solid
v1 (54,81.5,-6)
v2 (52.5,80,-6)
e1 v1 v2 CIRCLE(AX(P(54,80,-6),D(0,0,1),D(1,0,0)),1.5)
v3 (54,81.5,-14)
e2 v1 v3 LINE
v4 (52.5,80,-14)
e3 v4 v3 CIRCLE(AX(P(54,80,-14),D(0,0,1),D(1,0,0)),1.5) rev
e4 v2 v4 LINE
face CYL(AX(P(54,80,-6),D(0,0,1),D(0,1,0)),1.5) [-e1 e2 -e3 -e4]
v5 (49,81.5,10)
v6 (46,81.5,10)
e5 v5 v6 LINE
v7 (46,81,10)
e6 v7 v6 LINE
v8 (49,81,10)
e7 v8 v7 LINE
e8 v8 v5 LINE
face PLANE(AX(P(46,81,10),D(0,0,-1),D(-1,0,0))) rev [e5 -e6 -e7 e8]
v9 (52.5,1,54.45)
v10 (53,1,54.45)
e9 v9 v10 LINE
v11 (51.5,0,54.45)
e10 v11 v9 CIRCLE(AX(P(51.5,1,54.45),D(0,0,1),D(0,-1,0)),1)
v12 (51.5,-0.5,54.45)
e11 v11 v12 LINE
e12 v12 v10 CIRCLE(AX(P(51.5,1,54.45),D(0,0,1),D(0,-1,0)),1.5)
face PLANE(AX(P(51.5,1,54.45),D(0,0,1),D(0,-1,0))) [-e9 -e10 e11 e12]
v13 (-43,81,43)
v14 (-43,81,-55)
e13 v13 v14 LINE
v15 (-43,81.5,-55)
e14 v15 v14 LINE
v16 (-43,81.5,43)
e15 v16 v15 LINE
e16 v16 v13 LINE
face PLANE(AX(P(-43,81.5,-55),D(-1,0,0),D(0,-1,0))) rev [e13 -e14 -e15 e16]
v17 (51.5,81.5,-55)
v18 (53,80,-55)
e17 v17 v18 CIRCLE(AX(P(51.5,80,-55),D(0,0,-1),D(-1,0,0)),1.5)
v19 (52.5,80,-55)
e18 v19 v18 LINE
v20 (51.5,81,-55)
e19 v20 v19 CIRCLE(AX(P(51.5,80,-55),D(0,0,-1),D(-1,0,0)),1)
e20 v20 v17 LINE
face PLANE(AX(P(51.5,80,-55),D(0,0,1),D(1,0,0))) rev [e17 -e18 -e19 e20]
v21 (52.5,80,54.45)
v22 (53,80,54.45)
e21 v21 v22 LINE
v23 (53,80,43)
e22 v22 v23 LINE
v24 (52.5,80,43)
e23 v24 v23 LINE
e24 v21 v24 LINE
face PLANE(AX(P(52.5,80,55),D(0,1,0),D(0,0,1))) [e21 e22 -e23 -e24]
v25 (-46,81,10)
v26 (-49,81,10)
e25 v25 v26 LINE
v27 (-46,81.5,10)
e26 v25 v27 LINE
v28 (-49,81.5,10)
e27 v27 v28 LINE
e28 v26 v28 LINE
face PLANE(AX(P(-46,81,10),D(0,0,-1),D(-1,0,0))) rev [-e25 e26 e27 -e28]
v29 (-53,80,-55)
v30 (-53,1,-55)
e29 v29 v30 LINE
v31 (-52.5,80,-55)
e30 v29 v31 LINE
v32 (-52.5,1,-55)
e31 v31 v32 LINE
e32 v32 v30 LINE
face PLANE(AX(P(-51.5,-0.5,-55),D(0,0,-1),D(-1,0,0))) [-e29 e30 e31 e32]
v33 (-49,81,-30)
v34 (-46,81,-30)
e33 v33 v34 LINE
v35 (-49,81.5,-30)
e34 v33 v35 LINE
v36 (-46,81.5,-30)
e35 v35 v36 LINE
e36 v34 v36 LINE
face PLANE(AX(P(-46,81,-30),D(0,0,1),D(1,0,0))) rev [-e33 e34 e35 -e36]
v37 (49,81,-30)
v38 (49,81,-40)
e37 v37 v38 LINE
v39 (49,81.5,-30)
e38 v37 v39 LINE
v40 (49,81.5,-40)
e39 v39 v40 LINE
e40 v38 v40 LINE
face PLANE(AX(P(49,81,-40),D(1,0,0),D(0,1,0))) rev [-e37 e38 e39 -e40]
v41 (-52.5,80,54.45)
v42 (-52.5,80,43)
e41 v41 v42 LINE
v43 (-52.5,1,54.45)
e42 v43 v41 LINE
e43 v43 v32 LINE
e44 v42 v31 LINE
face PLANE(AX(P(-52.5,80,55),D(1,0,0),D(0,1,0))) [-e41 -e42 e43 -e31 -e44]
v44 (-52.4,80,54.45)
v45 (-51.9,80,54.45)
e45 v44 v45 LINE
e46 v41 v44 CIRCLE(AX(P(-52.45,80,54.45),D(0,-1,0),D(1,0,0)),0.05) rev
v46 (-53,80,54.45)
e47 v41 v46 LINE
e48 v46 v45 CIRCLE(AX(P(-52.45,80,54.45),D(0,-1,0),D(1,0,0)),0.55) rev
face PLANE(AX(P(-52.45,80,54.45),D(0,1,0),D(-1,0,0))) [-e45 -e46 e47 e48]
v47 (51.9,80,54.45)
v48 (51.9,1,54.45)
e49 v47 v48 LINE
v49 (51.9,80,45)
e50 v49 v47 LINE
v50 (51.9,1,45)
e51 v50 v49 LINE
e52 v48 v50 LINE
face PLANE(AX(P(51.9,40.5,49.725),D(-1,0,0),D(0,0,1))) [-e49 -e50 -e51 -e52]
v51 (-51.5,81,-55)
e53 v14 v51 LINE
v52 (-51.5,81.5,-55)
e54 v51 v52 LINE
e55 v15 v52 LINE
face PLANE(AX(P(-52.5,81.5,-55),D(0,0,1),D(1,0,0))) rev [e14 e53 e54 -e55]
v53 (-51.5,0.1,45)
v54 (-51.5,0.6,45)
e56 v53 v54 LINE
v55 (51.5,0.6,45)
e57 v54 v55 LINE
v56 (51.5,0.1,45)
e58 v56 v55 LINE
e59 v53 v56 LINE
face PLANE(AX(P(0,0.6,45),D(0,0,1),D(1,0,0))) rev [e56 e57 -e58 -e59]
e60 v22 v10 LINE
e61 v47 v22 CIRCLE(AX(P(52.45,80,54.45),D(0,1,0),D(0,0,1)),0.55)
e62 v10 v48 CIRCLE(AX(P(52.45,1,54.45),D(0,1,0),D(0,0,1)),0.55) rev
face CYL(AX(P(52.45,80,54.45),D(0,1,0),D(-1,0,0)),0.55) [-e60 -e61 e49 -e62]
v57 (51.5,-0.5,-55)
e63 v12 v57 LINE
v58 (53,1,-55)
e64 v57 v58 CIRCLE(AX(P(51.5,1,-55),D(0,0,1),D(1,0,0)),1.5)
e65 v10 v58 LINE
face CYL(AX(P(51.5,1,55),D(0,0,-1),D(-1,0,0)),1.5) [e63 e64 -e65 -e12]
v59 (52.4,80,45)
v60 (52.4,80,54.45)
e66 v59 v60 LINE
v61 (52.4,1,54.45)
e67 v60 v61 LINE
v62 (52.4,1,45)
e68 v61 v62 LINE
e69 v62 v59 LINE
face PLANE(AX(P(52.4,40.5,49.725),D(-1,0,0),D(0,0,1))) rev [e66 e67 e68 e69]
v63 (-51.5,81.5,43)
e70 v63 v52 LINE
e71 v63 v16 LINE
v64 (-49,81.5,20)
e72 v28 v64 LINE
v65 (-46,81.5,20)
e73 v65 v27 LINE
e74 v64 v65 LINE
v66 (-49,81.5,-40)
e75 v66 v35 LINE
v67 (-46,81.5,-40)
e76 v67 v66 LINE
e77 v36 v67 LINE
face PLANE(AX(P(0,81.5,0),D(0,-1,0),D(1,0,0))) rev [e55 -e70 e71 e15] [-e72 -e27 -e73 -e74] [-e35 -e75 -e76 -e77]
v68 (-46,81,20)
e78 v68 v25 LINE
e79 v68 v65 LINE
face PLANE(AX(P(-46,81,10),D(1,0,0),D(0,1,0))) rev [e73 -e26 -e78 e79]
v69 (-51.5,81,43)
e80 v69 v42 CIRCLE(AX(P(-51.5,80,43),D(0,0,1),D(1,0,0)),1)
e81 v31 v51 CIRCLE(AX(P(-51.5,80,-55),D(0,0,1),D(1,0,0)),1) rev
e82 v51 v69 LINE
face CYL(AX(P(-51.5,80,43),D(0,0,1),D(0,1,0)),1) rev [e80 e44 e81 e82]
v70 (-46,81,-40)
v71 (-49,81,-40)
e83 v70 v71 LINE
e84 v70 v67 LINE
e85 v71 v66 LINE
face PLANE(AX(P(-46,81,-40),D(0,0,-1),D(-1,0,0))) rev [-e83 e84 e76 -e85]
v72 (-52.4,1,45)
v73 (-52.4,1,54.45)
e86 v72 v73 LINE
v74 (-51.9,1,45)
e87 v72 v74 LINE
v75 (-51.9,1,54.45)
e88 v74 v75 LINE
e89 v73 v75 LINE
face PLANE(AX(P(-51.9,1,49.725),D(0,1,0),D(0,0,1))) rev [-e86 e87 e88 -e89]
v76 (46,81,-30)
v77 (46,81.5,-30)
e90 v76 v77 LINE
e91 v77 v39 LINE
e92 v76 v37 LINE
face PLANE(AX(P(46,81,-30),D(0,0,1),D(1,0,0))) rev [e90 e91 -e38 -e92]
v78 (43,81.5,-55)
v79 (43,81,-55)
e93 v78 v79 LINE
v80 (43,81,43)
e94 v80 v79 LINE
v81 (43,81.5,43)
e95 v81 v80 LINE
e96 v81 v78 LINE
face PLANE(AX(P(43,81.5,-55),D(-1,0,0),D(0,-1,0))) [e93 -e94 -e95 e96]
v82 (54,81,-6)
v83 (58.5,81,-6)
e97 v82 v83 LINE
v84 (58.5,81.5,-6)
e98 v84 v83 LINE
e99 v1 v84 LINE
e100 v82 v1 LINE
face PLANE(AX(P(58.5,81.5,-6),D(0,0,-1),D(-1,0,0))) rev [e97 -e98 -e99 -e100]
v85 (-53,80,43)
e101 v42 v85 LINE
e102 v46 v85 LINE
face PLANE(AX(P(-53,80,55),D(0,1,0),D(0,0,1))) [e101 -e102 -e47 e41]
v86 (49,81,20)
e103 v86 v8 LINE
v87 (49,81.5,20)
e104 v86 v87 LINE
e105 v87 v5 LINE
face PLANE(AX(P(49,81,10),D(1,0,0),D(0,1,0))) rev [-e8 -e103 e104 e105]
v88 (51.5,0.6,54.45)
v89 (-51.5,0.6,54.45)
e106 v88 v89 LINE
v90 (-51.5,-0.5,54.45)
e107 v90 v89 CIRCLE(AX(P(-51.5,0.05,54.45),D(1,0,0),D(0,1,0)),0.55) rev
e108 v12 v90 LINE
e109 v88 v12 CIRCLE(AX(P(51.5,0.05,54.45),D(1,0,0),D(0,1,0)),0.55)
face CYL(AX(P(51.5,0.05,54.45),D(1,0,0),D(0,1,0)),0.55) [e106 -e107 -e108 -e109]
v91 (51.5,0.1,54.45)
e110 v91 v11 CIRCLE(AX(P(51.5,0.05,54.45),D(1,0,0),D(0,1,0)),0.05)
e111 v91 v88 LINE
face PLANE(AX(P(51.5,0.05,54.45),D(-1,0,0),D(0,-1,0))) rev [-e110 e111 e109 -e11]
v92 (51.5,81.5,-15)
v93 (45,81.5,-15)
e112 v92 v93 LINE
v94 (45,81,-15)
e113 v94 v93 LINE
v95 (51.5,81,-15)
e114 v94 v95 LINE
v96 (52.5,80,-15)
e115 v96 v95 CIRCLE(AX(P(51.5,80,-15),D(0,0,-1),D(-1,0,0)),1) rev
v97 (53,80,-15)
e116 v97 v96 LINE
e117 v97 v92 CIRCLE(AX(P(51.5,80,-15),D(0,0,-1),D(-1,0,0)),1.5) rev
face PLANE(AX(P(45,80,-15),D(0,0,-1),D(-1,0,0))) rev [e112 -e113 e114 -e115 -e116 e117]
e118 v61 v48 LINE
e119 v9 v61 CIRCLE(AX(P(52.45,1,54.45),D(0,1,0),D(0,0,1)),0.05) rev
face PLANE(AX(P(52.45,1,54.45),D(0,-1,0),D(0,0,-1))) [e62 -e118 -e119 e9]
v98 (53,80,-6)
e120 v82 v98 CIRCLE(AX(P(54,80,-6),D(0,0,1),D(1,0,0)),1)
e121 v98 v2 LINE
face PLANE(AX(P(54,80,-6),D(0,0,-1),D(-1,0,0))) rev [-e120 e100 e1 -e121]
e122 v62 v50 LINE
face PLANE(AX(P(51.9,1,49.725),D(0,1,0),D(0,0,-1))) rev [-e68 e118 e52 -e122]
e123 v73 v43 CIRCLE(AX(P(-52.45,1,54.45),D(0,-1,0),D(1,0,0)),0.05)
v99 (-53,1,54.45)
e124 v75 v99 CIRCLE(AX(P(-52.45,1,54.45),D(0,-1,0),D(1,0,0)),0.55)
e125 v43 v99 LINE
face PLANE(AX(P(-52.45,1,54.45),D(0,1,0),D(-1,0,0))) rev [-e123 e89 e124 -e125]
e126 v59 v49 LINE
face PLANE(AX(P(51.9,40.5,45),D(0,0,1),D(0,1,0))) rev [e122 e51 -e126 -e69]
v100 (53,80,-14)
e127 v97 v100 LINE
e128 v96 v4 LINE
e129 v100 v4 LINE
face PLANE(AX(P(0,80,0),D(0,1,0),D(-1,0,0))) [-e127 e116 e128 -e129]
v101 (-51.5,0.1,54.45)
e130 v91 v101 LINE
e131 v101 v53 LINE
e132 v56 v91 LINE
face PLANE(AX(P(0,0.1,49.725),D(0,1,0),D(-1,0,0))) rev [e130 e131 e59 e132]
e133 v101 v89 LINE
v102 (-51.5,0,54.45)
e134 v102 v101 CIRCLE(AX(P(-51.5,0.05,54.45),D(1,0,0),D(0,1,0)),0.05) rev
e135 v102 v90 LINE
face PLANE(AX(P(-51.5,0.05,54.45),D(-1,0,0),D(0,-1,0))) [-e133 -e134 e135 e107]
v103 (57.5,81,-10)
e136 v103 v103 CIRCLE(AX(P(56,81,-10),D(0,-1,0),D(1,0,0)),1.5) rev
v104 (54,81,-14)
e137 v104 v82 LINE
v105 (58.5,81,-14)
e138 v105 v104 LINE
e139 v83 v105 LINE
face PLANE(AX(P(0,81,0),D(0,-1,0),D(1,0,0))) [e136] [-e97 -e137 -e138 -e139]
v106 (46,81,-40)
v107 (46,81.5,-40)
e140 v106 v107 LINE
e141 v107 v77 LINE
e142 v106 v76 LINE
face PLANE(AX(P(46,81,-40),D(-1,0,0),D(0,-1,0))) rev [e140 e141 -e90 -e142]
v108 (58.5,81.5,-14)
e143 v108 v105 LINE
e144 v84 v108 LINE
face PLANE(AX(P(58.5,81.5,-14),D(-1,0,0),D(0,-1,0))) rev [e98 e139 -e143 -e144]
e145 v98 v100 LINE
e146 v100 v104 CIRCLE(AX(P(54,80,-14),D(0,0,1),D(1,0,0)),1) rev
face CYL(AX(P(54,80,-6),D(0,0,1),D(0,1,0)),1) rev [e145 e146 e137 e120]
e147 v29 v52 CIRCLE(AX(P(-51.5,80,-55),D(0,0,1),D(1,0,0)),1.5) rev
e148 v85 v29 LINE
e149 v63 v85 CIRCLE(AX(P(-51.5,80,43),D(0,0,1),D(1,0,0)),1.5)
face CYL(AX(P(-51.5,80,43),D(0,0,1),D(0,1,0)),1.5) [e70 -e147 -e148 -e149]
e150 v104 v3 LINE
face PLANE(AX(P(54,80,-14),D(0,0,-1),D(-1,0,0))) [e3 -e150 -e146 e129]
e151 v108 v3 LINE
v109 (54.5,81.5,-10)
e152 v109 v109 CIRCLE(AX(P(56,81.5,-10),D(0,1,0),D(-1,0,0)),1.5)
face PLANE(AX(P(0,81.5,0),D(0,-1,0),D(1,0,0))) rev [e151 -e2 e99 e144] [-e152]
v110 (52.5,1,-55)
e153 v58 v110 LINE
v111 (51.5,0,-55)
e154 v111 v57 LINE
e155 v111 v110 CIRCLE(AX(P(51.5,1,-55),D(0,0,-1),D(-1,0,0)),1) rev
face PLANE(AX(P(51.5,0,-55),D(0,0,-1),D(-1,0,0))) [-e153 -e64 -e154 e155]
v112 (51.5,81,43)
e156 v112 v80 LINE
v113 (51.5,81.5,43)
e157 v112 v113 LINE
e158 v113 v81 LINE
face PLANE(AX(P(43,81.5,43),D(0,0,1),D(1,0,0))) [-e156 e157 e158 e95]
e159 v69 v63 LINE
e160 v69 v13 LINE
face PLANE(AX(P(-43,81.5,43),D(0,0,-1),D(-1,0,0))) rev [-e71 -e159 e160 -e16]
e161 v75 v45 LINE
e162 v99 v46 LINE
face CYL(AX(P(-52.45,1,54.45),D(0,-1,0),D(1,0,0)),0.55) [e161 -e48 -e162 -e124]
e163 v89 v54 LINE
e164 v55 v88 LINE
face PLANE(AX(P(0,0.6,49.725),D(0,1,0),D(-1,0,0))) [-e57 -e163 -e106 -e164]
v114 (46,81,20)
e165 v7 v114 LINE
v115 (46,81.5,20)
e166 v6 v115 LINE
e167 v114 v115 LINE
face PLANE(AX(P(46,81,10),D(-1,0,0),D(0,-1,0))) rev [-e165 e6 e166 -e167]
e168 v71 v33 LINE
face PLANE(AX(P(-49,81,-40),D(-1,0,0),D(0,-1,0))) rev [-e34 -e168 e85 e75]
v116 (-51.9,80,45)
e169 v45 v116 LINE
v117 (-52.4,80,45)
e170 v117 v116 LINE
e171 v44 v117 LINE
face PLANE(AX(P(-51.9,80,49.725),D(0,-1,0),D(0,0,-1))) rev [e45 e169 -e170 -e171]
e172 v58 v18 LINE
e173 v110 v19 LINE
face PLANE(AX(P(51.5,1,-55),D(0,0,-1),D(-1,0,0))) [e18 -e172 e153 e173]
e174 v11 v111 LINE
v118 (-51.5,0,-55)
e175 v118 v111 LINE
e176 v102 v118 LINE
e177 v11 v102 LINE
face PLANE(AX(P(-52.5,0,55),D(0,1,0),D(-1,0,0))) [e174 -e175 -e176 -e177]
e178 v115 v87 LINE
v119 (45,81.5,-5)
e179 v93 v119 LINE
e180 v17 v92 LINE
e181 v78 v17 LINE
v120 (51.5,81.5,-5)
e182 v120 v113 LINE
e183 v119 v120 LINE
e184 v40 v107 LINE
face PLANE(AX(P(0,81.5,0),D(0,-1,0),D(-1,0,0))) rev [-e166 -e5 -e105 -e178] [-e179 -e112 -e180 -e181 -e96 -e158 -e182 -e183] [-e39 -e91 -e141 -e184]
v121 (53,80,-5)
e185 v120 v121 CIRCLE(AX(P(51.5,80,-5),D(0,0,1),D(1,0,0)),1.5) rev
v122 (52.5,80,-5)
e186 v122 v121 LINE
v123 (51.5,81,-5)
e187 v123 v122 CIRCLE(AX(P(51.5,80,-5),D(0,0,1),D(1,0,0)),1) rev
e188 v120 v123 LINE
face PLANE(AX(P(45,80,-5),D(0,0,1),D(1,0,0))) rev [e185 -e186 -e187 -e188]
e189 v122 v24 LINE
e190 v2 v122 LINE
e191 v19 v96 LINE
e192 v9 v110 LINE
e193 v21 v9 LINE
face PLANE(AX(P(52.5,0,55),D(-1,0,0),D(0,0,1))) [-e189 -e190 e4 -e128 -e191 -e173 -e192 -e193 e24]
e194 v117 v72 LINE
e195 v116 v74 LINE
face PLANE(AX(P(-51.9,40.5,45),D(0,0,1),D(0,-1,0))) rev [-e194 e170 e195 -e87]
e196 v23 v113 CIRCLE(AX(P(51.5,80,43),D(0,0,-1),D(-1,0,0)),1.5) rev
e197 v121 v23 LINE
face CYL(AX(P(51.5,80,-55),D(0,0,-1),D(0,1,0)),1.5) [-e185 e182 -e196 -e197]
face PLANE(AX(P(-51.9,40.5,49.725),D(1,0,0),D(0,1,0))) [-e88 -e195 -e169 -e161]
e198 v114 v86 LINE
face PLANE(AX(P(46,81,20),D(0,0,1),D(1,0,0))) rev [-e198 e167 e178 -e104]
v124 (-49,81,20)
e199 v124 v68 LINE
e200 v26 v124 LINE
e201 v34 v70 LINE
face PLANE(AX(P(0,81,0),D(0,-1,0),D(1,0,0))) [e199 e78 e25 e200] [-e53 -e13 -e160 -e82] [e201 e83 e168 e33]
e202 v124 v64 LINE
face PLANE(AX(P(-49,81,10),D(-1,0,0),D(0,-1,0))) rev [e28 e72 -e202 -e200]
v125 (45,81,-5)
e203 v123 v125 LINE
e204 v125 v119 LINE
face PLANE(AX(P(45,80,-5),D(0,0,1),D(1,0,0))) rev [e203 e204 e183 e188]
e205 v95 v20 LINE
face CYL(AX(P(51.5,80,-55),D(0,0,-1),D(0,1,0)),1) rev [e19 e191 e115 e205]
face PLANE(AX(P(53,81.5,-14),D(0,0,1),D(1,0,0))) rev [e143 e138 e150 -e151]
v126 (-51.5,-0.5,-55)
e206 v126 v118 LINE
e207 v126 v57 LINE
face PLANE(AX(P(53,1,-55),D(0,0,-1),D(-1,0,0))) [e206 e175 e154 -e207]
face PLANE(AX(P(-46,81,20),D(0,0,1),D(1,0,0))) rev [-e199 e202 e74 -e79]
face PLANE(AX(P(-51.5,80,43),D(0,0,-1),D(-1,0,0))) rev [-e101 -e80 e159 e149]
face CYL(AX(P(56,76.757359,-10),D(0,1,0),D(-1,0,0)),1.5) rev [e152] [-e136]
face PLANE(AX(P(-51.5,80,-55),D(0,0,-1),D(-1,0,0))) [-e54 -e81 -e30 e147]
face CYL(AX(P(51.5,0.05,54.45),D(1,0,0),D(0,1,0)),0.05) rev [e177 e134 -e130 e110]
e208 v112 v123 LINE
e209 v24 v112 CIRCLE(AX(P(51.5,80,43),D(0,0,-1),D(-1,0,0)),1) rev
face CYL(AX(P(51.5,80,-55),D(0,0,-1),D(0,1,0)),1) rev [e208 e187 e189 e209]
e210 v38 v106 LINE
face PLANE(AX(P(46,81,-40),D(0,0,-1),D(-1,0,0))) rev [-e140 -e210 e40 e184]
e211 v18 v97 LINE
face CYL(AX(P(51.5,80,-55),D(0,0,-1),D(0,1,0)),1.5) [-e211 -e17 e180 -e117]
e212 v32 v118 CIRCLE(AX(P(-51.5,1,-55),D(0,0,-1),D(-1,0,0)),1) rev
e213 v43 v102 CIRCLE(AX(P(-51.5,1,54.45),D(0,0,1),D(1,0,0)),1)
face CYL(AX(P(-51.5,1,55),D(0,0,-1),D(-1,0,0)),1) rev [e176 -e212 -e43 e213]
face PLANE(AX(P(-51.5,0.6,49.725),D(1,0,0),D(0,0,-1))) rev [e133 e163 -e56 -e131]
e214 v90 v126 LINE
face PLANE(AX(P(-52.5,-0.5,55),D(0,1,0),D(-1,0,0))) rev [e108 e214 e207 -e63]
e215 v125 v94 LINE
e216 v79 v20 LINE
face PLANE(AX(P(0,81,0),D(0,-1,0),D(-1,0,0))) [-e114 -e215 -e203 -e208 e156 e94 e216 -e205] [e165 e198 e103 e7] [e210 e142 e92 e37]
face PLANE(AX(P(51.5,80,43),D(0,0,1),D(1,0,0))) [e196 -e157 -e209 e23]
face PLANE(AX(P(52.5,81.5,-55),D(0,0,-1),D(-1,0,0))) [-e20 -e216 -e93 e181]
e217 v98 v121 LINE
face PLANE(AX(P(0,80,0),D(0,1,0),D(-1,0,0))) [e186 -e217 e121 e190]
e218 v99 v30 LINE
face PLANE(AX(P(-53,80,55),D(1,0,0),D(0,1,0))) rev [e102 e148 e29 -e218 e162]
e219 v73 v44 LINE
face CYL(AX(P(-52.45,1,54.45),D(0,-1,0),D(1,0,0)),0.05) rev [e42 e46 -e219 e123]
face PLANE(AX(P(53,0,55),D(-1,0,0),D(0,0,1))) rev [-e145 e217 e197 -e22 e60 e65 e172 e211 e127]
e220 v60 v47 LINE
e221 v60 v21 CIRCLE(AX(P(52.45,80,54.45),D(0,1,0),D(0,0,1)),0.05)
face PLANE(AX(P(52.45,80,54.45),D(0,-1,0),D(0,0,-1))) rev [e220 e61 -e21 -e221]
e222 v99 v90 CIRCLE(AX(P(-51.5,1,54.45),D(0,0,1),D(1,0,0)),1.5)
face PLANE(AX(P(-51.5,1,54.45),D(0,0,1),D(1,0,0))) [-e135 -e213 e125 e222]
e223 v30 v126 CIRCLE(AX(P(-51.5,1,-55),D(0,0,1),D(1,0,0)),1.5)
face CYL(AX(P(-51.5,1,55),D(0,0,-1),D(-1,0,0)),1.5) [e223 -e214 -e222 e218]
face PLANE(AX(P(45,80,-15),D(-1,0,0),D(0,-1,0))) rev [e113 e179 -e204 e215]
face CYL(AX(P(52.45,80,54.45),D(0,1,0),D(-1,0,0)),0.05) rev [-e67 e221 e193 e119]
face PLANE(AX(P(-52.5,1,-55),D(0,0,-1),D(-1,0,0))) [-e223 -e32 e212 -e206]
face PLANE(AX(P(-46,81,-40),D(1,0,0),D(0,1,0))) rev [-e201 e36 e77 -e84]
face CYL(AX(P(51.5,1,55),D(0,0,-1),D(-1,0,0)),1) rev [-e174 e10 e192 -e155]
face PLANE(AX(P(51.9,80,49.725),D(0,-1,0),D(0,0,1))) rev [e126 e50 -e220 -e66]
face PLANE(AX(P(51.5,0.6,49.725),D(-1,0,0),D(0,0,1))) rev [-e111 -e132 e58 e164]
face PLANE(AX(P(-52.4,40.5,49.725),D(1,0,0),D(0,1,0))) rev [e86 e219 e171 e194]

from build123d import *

# Parameters (mm, degrees)
SM_BASE_FLANGE_1_DEPTH = 55
OTHER_START            = -1
OTHER_1_DEPTH          = 2
OTHER_START_2          = 1
OTHER_1_2_DEPTH        = 79
OTHER_START_3          = -0.24719
OTHER_1_3_DEPTH        = 81.24719
OTHER_START_4          = -51.5
OTHER_1_4_DEPTH        = 103
OTHER_1_5_DEPTH        = 103
SM_EDGE_FLANGE_1_DEPTH = 98
SKETCH_19_W            = 10
SKETCH_19_H            = 10
CUT_EXTRUDE_1_DEPTH    = 1.5
SM_EDGE_FLANGE_2_DEPTH = 8
SKETCH_24_R            = 1.5
CUT_EXTRUDE_2_DEPTH    = 0.5
SKETCH_27_W            = 3
SKETCH_27_H            = 10
CUT_EXTRUDE_3_DEPTH    = 0.5


with BuildPart() as part:
    # 基体-法兰1: sheet metal written as solids
    # Sketch 1 → 基体-法兰1 (new, symmetric)
    with BuildSketch(Plane.XY):
        with BuildLine():
            Line((-52.5, 80), (-52.5, 1))
            ThreePointArc((-52.5, 1), (-52.207106781, 0.292893219), (-51.5, 0))
            Line((-51.5, 0), (51.5, 0))
            ThreePointArc((51.5, 0), (52.207106781, 0.292893219), (52.5, 1))
            Line((52.5, 1), (52.5, 80))
            Line((52.5, 80), (53, 80))
            Line((53, 80), (53, 1))
            ThreePointArc((53, 1), (52.560660172, -0.060660172), (51.5, -0.5))
            Line((51.5, -0.5), (-51.5, -0.5))
            ThreePointArc((-51.5, -0.5), (-52.560660172, -0.060660172), (-53, 1))
            Line((-53, 1), (-53, 80))
            Line((-53, 80), (-52.5, 80))
        make_face()
    extrude(amount=SM_BASE_FLANGE_1_DEPTH, both=True)

    # Other 1: read off the stored shape, not the designer's step
    # Other 1 outline → Other 1 (cut)
    with BuildSketch(Plane(origin=(0, 0, 0), x_dir=(1, 0, 0), z_dir=(0, 1, 0)).offset(OTHER_START)):
        with BuildLine():
            Line((51.5, -54.45), (51.5, -55))
            Line((51.5, -55), (52.45, -55))
            ThreePointArc((52.45, -55), (52.83890873, -54.83890873), (53, -54.45))
            Line((53, -54.45), (51.5, -54.45))
        make_face()
        with BuildLine():
            Line((-52.45, -55), (-51.5, -55))
            Line((-51.5, -55), (-51.5, -54.45))
            Line((-51.5, -54.45), (-53, -54.45))
            ThreePointArc((-53, -54.45), (-52.83890873, -54.83890873), (-52.45, -55))
        make_face()
    extrude(amount=OTHER_1_DEPTH, mode=Mode.SUBTRACT)

    # Other 1 2 outline → Other 1 2 (add)
    with BuildSketch(Plane(origin=(0, 0, 0), x_dir=(1, 0, 0), z_dir=(0, 1, 0)).offset(OTHER_START_2)):
        with BuildLine():
            Line((51.9, -45), (51.9, -54.45))
            ThreePointArc((51.9, -54.45), (52.45, -55), (53, -54.45))
            Line((53, -54.45), (52.5, -54.45))
            ThreePointArc((52.5, -54.45), (52.45, -54.5), (52.4, -54.45))
            Line((52.4, -54.45), (52.4, -45))
            Line((52.4, -45), (51.9, -45))
        make_face()
        with BuildLine():
            ThreePointArc((-53, -54.45), (-52.45, -55), (-51.9, -54.45))
            Line((-51.9, -54.45), (-51.9, -45))
            Line((-51.9, -45), (-52.4, -45))
            Line((-52.4, -45), (-52.4, -54.45))
            ThreePointArc((-52.4, -54.45), (-52.45, -54.5), (-52.5, -54.45))
            Line((-52.5, -54.45), (-53, -54.45))
        make_face()
    extrude(amount=OTHER_1_2_DEPTH)

    # Other 1 3 outline → Other 1 3 (cut)
    with BuildSketch(Plane(origin=(0, 0, 0), x_dir=(1, 0, 0), z_dir=(0, 1, 0)).offset(OTHER_START_3)):
        with BuildLine():
            ThreePointArc((-52.45, -55), (-52.83890873, -54.83890873), (-53, -54.45))
            Line((-53, -54.45), (-53, -55))
            Line((-53, -55), (-52.45, -55))
        make_face()
        with BuildLine():
            Line((52.45, -55), (53, -55))
            Line((53, -55), (53, -54.45))
            ThreePointArc((53, -54.45), (52.83890873, -54.83890873), (52.45, -55))
        make_face()
    extrude(amount=OTHER_1_3_DEPTH, mode=Mode.SUBTRACT)

    # Other 1 4 outline → Other 1 4 (cut)
    with BuildSketch(Plane.YZ.offset(OTHER_START_4)):
        with BuildLine():
            ThreePointArc((-0.5, 54.45), (-0.35620192, 54.820809924), (0, 54.997722558))
            Line((0, 54.997722558), (0, 55))
            Line((0, 55), (-0.5, 55))
            Line((-0.5, 55), (-0.5, 54.45))
        make_face()
    extrude(amount=OTHER_1_4_DEPTH, mode=Mode.SUBTRACT)

    # Other 1 5 outline → Other 1 5 (add)
    with BuildSketch(Plane.YZ.offset(OTHER_START_4)):
        with BuildLine():
            Line((0.1, 45), (0.6, 45))
            Line((0.6, 45), (0.6, 54.45))
            ThreePointArc((0.6, 54.45), (0.420809924, 54.85620192), (0, 54.997722558))
            Line((0, 54.997722558), (0, 54.45))
            ThreePointArc((0, 54.45), (0.05, 54.5), (0.1, 54.45))
            Line((0.1, 54.45), (0.1, 45))
        make_face()
    extrude(amount=OTHER_1_5_DEPTH)

    # 边线-法兰1: sheet metal written as solids
    # 边线-法兰1 section (on a plane across the edge) → 边线-法兰1 (add)
    with BuildSketch(Plane(origin=(-52.5, 81, -55), x_dir=(0, -1, 0), z_dir=(0, 0, 1))):
        with BuildLine():
            Line((-0.5, 1), (-0.5, 9.5))
            Line((-0.5, 9.5), (0, 9.5))
            Line((0, 9.5), (0, 1))
            ThreePointArc((0, 1), (0.292893219, 0.292893219), (1, 0))
            Line((1, 0), (1, -0.5))
            ThreePointArc((1, -0.5), (-0.060660172, -0.060660172), (-0.5, 1))
        make_face()
    sm_edge_flange_1 = extrude(amount=SM_EDGE_FLANGE_1_DEPTH)

    # 镜向1: 边线-法兰1 across plane
    add(sm_edge_flange_1.mirror(Plane(origin=(0, 0, 0), x_dir=(0, 0, 1), z_dir=(1, 0, 0))))

    # 草图19 → 切除-拉伸1 (cut)
    with BuildSketch(Plane(origin=(0, 81.5, 0), x_dir=(1, 0, 0), z_dir=(0, 1, 0))):
        with Locations((50, 10)):
            Rectangle(SKETCH_19_W, SKETCH_19_H)
    extrude(amount=-CUT_EXTRUDE_1_DEPTH, mode=Mode.SUBTRACT)

    # 边线-法兰2: sheet metal written as solids
    # 边线-法兰2 section (on a plane across the edge) → 边线-法兰2 (add)
    with BuildSketch(Plane(origin=(53, 81, -14), x_dir=(0, -1, 0), z_dir=(0, 0, 1))):
        with BuildLine():
            Line((-0.5, 1), (-0.5, 5.5))
            Line((-0.5, 5.5), (0, 5.5))
            Line((0, 5.5), (0, 1))
            ThreePointArc((0, 1), (0.292893219, 0.292893219), (1, 0))
            Line((1, 0), (1, -0.5))
            ThreePointArc((1, -0.5), (-0.060660172, -0.060660172), (-0.5, 1))
        make_face()
    extrude(amount=SM_EDGE_FLANGE_2_DEPTH)

    # 草图24 → 切除-拉伸2 (cut)
    with BuildSketch(Plane(origin=(0, 81.5, 0), x_dir=(1, 0, 0), z_dir=(0, 1, 0))):
        with Locations(Location((56, 10, 0), (0, 0, 180))):
            Circle(SKETCH_24_R)
    extrude(amount=-CUT_EXTRUDE_2_DEPTH, mode=Mode.SUBTRACT)

    # 草图27 → 切除-拉伸3 (cut)
    with BuildSketch(Plane(origin=(0, 81.5, 0), x_dir=(1, 0, 0), z_dir=(0, 1, 0))):
        with Locations((47.5, 35)):
            Rectangle(SKETCH_27_W, SKETCH_27_H)
        with Locations((47.5, -15)):
            Rectangle(SKETCH_27_W, SKETCH_27_H)
        with Locations((-47.5, 35)):
            Rectangle(SKETCH_27_W, SKETCH_27_H)
        with Locations((-47.5, -15)):
            Rectangle(SKETCH_27_W, SKETCH_27_H)
    extrude(amount=-CUT_EXTRUDE_3_DEPTH, mode=Mode.SUBTRACT)


solid = part.part
